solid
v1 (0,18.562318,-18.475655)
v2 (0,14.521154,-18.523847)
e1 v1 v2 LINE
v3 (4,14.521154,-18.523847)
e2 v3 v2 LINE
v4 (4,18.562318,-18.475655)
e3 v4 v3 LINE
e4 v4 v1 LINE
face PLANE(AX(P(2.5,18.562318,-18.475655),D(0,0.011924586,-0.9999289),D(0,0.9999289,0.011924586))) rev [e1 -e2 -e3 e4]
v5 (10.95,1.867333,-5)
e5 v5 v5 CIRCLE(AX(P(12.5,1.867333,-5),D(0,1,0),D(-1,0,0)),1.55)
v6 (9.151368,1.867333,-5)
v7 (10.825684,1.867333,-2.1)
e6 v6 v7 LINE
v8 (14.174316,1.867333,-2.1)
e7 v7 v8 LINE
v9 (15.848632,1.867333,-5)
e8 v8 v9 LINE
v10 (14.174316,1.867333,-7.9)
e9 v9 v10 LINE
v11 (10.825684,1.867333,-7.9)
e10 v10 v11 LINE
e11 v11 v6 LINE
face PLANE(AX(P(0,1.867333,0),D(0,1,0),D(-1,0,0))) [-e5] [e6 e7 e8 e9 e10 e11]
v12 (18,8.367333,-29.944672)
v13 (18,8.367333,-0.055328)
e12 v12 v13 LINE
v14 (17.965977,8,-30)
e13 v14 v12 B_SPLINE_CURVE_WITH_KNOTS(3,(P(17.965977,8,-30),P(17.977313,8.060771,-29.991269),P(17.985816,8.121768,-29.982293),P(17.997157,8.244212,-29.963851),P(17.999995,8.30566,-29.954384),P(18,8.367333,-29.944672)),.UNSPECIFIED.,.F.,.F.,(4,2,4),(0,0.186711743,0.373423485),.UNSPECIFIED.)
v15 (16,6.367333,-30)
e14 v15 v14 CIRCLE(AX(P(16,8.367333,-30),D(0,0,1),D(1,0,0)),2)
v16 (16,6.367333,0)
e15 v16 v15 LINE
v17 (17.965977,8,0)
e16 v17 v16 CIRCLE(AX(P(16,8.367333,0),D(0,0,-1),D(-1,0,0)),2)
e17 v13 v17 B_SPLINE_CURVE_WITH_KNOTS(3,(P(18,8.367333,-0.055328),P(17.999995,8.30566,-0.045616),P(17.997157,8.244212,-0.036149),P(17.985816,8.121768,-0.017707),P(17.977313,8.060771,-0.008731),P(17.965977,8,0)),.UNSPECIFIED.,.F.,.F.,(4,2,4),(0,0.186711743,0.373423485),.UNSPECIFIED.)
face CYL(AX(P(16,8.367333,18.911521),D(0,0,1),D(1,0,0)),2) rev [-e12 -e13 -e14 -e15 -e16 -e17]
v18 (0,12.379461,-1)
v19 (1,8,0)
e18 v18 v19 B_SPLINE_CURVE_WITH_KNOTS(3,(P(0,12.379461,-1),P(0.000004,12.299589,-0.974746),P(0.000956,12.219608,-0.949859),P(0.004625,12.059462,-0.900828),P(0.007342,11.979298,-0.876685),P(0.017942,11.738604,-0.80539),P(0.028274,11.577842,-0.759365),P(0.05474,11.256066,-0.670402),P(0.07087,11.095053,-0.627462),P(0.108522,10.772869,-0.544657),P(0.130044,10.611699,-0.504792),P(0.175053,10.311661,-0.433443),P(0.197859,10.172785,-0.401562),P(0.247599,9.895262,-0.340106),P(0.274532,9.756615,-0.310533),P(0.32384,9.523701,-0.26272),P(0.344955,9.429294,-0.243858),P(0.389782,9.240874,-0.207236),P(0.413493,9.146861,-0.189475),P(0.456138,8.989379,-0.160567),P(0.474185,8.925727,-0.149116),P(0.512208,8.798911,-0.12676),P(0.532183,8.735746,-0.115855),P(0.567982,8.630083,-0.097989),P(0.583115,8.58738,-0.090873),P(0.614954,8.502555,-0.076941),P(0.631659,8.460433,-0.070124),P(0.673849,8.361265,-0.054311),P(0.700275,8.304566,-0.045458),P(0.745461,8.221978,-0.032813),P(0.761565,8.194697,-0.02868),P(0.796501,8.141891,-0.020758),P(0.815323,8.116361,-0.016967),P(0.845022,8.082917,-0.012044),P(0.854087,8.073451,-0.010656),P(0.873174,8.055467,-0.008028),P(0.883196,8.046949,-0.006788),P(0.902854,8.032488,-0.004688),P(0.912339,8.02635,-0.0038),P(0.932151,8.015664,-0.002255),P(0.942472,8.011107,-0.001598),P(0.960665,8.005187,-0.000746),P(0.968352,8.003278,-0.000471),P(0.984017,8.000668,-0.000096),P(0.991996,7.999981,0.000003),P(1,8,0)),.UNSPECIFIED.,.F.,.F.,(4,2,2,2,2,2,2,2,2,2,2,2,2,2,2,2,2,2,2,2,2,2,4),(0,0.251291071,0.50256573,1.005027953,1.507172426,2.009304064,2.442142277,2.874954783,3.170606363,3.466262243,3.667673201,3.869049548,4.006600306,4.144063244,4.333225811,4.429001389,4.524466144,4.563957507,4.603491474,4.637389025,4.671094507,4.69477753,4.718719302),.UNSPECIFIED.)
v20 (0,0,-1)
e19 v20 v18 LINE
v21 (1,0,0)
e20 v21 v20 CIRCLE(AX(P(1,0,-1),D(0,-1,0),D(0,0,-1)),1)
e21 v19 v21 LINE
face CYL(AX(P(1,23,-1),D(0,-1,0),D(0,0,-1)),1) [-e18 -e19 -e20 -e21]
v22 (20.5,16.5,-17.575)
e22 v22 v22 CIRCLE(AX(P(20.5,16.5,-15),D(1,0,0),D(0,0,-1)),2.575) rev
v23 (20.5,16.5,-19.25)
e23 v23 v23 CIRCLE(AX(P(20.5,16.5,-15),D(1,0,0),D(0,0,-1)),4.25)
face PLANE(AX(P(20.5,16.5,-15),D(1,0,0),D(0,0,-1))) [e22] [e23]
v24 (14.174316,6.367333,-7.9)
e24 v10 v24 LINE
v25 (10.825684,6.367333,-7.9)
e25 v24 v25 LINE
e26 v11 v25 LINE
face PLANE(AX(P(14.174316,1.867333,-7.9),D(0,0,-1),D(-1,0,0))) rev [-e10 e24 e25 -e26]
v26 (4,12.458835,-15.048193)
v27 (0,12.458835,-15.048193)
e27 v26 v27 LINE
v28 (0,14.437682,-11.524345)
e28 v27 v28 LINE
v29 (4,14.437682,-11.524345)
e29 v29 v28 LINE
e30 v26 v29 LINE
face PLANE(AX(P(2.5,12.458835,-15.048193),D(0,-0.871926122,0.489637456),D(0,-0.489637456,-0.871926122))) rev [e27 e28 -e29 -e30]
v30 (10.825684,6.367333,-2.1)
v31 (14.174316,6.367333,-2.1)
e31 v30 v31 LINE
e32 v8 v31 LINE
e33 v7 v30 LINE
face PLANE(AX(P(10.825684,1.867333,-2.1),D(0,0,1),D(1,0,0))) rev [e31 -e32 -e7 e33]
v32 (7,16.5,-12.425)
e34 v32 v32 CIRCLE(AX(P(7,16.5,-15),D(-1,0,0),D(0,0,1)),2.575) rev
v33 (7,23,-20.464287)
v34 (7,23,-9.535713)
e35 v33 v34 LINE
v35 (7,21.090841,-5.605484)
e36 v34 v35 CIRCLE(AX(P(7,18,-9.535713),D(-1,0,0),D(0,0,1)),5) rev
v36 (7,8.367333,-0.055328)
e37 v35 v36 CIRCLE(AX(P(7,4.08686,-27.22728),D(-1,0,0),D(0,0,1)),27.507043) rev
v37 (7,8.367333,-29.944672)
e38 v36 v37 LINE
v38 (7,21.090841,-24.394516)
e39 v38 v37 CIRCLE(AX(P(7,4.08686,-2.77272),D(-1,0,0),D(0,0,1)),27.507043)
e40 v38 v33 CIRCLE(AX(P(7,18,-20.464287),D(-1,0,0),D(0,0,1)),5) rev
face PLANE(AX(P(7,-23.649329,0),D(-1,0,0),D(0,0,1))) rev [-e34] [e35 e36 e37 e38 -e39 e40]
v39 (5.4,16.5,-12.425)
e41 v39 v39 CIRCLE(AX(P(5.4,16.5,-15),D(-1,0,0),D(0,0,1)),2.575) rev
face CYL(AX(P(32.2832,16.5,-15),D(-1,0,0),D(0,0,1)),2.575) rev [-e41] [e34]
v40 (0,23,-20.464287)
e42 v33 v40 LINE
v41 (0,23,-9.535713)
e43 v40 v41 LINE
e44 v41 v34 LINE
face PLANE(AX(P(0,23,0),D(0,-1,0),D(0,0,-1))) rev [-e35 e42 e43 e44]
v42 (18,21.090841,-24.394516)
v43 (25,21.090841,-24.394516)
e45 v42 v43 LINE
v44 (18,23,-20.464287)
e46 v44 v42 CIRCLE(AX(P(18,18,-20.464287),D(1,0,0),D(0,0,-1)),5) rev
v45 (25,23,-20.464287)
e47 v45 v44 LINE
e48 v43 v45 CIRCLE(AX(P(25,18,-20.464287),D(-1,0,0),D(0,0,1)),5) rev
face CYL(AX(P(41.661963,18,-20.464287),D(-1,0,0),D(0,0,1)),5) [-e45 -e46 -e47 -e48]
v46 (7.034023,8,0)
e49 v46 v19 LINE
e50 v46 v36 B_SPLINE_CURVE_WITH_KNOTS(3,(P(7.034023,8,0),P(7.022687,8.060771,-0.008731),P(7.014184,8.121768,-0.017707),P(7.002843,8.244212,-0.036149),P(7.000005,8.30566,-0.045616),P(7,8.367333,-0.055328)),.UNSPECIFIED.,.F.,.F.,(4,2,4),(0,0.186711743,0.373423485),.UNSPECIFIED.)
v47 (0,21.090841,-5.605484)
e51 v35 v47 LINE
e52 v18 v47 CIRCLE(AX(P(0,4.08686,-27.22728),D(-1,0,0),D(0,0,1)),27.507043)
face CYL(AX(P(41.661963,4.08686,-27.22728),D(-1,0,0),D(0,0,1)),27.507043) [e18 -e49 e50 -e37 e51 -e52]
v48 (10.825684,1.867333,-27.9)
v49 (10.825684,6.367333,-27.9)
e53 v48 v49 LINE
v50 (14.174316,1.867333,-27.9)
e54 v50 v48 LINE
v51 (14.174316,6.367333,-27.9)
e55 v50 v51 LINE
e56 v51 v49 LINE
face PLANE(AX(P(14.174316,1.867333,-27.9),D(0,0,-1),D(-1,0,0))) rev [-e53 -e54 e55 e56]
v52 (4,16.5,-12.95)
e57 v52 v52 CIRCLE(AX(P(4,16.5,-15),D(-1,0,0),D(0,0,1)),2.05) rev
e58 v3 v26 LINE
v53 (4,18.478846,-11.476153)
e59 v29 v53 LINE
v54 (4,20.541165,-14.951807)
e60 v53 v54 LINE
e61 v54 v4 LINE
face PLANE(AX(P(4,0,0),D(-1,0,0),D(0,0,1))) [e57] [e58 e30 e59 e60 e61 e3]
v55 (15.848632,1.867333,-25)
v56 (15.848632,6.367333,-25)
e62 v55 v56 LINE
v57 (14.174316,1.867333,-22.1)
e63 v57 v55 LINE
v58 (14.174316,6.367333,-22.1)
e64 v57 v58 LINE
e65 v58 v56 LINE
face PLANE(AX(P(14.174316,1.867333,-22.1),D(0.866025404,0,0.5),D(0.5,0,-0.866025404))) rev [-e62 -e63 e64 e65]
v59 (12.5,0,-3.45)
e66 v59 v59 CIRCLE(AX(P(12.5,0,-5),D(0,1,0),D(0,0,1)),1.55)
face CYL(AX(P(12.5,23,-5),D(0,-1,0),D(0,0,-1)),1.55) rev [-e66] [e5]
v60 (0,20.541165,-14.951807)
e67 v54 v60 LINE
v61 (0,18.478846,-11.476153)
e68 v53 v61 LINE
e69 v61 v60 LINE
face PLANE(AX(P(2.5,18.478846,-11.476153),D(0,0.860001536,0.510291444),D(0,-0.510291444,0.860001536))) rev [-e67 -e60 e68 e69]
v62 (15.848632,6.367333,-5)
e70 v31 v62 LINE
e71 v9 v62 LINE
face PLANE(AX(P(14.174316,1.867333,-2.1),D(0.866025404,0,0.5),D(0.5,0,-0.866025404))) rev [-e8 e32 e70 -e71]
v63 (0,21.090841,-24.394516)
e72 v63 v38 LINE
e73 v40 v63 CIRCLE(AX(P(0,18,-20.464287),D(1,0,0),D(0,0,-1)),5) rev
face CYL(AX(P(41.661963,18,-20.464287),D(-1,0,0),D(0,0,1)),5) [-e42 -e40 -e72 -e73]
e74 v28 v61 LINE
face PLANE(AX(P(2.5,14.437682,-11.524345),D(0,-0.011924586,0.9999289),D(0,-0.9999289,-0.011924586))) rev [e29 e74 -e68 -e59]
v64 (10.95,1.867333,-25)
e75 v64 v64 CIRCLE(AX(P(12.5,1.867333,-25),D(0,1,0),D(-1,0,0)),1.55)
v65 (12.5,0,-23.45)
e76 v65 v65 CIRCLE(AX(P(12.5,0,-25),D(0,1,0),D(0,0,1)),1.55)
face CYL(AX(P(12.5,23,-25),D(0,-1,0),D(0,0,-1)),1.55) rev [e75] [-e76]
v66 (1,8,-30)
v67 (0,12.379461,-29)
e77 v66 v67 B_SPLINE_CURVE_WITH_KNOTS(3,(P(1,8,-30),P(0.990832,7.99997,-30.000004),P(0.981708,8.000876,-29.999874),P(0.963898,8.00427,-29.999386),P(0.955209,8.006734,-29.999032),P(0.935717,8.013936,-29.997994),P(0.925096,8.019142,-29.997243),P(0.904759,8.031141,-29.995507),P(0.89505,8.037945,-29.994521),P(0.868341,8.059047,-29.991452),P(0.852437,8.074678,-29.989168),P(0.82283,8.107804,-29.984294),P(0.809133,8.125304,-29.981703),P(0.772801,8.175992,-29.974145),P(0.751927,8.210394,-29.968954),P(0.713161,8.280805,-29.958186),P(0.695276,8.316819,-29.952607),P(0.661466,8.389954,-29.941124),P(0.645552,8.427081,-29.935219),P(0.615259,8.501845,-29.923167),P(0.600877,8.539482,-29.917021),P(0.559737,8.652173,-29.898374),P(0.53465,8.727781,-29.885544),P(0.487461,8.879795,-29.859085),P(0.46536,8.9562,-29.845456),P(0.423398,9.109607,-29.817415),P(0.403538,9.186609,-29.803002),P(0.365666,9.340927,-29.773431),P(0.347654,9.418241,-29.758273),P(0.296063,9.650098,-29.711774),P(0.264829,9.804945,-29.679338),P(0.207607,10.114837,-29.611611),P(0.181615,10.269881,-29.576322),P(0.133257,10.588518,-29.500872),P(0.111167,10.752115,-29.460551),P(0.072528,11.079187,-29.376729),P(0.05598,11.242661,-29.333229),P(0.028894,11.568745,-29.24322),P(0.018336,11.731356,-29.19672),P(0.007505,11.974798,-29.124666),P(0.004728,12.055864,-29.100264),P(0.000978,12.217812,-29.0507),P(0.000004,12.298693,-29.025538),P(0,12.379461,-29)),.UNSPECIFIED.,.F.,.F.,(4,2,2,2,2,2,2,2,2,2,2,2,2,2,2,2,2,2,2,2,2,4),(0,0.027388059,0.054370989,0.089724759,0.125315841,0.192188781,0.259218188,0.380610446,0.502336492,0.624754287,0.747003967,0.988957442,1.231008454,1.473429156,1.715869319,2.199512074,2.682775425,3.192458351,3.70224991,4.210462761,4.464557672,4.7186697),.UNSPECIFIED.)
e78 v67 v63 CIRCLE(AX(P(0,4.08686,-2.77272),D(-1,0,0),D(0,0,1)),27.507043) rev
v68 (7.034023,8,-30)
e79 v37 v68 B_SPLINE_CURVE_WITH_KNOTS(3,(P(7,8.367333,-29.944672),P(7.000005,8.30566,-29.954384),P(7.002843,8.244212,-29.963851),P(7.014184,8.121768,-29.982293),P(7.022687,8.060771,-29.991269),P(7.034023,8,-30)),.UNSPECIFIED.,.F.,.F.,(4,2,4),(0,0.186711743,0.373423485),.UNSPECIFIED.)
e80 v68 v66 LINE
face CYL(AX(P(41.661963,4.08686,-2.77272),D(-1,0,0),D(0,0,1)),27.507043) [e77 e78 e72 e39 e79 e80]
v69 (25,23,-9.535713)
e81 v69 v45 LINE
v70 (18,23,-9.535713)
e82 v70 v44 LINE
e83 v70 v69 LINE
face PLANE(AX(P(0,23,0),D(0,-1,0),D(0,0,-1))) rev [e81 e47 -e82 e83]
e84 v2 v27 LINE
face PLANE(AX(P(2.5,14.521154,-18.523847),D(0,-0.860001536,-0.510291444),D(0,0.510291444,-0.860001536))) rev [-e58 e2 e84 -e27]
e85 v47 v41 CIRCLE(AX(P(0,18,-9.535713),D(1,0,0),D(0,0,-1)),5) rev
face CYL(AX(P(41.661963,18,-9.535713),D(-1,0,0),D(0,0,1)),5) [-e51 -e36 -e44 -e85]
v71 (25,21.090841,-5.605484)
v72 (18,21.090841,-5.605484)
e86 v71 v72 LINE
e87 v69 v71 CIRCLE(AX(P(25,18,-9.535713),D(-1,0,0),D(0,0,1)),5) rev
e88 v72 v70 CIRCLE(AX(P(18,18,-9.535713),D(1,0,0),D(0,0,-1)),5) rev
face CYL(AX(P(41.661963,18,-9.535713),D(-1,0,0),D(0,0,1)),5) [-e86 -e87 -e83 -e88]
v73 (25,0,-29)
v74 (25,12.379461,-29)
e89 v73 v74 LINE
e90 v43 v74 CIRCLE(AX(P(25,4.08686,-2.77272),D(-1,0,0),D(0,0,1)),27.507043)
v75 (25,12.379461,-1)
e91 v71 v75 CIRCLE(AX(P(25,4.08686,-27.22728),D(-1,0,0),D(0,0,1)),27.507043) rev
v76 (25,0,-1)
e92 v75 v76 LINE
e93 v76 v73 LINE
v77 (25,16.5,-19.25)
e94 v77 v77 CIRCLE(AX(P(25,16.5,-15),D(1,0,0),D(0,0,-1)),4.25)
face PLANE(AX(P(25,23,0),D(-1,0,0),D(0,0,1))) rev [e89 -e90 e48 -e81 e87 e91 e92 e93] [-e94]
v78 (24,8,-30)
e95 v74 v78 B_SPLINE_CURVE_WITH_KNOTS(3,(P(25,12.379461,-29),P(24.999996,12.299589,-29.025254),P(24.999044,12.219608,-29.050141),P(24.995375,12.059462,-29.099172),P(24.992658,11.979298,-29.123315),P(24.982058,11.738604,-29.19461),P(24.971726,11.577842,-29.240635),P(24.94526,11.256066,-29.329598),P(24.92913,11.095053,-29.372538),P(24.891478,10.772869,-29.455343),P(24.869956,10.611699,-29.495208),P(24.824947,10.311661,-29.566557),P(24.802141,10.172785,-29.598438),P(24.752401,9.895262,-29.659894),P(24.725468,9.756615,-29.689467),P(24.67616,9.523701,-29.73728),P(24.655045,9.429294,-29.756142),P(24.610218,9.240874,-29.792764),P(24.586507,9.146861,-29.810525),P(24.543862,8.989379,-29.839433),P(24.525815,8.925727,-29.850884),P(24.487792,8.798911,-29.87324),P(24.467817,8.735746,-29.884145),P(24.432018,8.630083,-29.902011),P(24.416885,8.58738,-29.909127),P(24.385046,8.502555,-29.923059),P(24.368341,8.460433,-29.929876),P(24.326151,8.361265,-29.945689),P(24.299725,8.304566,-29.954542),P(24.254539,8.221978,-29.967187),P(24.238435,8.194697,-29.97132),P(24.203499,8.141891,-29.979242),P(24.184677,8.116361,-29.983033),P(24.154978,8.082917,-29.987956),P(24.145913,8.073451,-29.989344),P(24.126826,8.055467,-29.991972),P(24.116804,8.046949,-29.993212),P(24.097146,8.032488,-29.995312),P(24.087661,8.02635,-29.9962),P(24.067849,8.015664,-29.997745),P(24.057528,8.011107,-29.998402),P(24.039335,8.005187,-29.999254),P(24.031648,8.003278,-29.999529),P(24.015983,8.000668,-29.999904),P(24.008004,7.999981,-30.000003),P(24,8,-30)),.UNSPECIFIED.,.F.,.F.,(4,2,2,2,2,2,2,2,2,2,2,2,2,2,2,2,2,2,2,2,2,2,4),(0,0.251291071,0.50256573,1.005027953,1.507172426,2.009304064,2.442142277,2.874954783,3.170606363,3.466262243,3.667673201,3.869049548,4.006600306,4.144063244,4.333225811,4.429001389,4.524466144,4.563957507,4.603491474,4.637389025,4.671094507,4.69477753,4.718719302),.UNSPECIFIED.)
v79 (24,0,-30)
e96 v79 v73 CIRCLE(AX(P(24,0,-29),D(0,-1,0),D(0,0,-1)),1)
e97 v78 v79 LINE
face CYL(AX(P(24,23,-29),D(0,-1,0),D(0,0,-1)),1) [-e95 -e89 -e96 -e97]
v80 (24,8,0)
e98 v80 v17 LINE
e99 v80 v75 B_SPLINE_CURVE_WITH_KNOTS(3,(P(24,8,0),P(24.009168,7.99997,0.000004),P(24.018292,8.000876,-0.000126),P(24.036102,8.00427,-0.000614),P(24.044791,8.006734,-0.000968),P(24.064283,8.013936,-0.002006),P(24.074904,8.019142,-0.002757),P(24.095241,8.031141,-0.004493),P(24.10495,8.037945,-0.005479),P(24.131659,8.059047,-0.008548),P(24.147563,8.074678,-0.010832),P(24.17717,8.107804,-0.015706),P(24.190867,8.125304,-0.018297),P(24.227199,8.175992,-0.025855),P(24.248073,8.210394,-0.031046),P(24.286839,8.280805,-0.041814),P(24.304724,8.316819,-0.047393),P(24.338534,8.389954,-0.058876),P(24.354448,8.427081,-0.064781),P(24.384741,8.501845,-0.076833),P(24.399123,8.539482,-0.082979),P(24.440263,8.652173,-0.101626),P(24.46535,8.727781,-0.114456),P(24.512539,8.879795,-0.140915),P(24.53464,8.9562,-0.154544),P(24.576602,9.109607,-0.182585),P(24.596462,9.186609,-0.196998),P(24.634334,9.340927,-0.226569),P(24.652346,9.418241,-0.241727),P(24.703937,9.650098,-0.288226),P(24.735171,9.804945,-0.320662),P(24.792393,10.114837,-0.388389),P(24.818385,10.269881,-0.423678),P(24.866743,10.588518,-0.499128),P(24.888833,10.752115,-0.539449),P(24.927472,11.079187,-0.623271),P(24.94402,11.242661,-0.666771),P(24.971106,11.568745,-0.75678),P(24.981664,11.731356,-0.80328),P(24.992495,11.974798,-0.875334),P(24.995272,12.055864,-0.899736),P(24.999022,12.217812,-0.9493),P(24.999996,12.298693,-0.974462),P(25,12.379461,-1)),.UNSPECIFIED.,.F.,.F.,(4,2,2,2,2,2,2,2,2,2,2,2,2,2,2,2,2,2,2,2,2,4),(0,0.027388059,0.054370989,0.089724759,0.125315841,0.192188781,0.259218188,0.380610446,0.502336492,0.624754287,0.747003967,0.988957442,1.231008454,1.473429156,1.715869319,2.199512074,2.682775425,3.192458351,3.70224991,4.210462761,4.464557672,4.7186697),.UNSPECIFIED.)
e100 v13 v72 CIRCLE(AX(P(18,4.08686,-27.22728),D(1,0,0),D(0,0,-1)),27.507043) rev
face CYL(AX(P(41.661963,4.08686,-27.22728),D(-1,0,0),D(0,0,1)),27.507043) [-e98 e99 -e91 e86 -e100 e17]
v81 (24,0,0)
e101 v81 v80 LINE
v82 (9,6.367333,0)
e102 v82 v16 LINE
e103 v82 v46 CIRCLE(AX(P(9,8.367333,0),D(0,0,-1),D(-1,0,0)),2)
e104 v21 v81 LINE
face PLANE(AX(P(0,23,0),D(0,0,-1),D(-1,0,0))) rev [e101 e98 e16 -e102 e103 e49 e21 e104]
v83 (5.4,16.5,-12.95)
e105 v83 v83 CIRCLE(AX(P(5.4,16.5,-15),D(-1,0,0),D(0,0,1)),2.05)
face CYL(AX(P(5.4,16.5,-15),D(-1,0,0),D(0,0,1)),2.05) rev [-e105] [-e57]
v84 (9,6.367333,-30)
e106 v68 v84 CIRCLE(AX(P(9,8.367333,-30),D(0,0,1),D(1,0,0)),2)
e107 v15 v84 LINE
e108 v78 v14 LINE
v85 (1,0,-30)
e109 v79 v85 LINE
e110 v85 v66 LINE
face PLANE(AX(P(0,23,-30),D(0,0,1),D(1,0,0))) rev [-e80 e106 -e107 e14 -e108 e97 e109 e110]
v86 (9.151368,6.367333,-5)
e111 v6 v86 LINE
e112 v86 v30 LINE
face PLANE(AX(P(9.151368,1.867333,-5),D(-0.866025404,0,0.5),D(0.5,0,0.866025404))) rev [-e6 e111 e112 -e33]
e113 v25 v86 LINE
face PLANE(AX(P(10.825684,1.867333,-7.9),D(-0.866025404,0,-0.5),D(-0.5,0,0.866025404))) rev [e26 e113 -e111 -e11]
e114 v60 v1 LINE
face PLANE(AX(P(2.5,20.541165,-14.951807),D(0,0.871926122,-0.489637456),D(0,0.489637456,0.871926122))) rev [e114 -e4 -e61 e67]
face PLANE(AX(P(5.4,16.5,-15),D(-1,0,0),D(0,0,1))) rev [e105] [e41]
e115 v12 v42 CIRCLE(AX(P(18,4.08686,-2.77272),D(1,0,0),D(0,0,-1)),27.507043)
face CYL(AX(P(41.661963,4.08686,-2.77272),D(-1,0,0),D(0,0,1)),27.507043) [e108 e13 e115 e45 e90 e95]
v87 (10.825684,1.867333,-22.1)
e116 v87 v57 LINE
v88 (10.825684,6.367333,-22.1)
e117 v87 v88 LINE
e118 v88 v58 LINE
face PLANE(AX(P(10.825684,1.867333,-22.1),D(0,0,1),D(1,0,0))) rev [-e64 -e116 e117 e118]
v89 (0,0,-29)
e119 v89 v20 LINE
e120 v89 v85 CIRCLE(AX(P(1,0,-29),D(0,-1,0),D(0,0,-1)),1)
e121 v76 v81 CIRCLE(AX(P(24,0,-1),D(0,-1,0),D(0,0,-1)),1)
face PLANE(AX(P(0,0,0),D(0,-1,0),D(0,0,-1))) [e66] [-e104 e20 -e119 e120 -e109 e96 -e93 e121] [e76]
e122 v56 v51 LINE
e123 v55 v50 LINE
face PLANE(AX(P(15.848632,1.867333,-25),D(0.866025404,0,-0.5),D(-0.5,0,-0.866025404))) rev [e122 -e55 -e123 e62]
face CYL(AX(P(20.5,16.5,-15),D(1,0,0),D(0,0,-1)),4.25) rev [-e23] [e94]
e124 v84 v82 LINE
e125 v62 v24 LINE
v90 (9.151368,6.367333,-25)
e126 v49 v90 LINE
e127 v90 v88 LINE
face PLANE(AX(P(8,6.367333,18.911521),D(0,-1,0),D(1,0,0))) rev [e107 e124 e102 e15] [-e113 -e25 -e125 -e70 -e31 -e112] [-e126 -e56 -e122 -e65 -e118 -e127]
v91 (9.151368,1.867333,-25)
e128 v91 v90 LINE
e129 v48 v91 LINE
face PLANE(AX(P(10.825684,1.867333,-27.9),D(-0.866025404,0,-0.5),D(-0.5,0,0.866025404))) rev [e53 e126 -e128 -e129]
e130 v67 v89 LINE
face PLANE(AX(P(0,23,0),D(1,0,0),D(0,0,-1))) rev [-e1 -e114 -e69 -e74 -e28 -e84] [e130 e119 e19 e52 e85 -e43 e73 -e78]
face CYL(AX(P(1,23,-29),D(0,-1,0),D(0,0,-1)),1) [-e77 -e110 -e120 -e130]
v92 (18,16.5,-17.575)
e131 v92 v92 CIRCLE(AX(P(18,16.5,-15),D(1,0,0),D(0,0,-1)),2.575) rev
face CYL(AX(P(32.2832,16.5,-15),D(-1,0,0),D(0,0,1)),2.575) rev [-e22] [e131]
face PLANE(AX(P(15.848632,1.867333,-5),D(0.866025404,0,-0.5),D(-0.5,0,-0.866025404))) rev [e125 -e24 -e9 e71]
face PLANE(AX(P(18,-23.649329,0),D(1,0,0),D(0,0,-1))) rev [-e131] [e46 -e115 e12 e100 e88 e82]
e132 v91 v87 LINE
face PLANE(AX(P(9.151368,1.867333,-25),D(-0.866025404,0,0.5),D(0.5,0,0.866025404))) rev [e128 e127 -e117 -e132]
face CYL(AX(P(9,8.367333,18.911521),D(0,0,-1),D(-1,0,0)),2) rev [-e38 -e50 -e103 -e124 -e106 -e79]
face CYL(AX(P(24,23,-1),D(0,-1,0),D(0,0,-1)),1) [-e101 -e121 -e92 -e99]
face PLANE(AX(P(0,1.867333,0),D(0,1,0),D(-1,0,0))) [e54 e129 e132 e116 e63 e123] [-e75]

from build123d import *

# Parameters (mm, degrees)
CROQUIS1_W              = 25
CROQUIS1_H              = 30
CROQUIS1_R              = 1.55
SALIENTE_EXTRUIR1_DEPTH = 23
CORTAR_EXTRUIR1_REACH   = 47.321
CROQUIS2_W              = 9
CROQUIS2_H              = 16.632666969
CORTAR_EXTRUIR2_REACH   = 47.321
CROQUIS3_R              = 2.575
CORTAR_EXTRUIR3_DEPTH   = 2.5
CROQUIS5_R              = 4.25
CORTAR_EXTRUIR4_DEPTH   = 4.5
CORTAR_EXTRUIR5_DEPTH   = 4.5
CORTAR_EXTRUIR6_REACH   = 47.321
REDONDEO3_R             = 1
CROQUIS8_R              = 2.575
CROQUIS8_R_2            = 2.05
SALIENTE_EXTRUIR2_DEPTH = 2.9
CORTAR_EXTRUIR7_DEPTH   = 1.5
CORTAR_EXTRUIR8_START   = -16.632667
CROQUIS10_W             = 1
CROQUIS10_H             = 30
CORTAR_EXTRUIR8_DEPTH   = 16.632667
REDONDEO4_R             = 5
REDONDEO5_R             = 2


with BuildPart() as part:
    # Croquis1 → Saliente-Extruir1 (new body)
    with BuildSketch(Plane(origin=(0, 0, 0), x_dir=(1, 0, 0), z_dir=(0, 1, 0))):
        with Locations((12.5, 15)):
            Rectangle(CROQUIS1_W, CROQUIS1_H)
        with Locations(Location((12.5, 25, 0), (0, 0, 270))):
            Circle(CROQUIS1_R, mode=Mode.SUBTRACT)
        with Locations(Location((12.5, 5, 0), (0, 0, 270))):
            Circle(CROQUIS1_R, mode=Mode.SUBTRACT)
    extrude(amount=SALIENTE_EXTRUIR1_DEPTH)

    # Cortar-Extruir1: up to this face of the body (flat: up to its plane)
    cortar_extruir1_end = Plane(part.part.faces().sort_by_distance((12.5, 11.5, 0))[0])
    # Croquis2 → Cortar-Extruir1 (cut, up to the picked face)
    with BuildSketch(Plane(origin=(0, 0, -30), x_dir=(-1, 0, 0), z_dir=(0, 0, -1)), mode=Mode.PRIVATE) as cortar_extruir1_sk1:
        with Locations((-12.5, 14.683666516)):
            Rectangle(CROQUIS2_W, CROQUIS2_H)
    cortar_extruir1_tool1 = split(extrude(cortar_extruir1_sk1.sketch, amount=-CORTAR_EXTRUIR1_REACH, mode=Mode.PRIVATE), bisect_by=cortar_extruir1_end, keep=Keep.BOTH, mode=Mode.PRIVATE)
    add(cortar_extruir1_tool1.solids().sort_by(Axis((12.5, 14.683667, -30), (0, 0, 1)))[0], mode=Mode.SUBTRACT)

    # Cortar-Extruir2: up to this face of the body (flat: up to its plane)
    cortar_extruir2_end = Plane(part.part.faces().sort_by_distance((25, 11.5, -15))[0])
    # Croquis3 → Cortar-Extruir2 (cut, up to the picked face)
    with BuildSketch(Plane.ZY, mode=Mode.PRIVATE) as cortar_extruir2_sk1:
        with Locations((-15, 16.5)):
            Circle(CROQUIS3_R)
    cortar_extruir2_tool1 = split(extrude(cortar_extruir2_sk1.sketch, amount=-CORTAR_EXTRUIR2_REACH, mode=Mode.PRIVATE), bisect_by=cortar_extruir2_end, keep=Keep.BOTH, mode=Mode.PRIVATE)
    add(cortar_extruir2_tool1.solids().sort_by(Axis((0, 16.5, -15), (1, 0, 0)))[0], mode=Mode.SUBTRACT)

    # Croquis4 → Cortar-Extruir3 (cut)
    with BuildSketch(Plane.ZY):
        Polygon((-14.95180736, 20.541164535), (-18.475654829, 18.562318318), (-18.523847469, 14.521153783), (-15.04819264, 12.458835465), (-11.524345171, 14.437681682), (-11.476152531, 18.478846217), align=None)
    extrude(amount=-CORTAR_EXTRUIR3_DEPTH, mode=Mode.SUBTRACT)

    # Croquis5 → Cortar-Extruir4 (cut)
    with BuildSketch(Plane(origin=(25, 0, 0), x_dir=(0, 0, -1), z_dir=(1, 0, 0))):
        with Locations((15, 16.5)):
            Circle(CROQUIS5_R)
    extrude(amount=-CORTAR_EXTRUIR4_DEPTH, mode=Mode.SUBTRACT)

    # Croquis6 → Cortar-Extruir5 (cut)
    with BuildSketch(Plane(origin=(0, 6.367333031, 0), x_dir=(1, 0, 0), z_dir=(0, 1, 0))):
        Polygon((15.848631561, 25), (14.174315781, 27.9), (10.825684219, 27.9), (9.151368439, 25), (10.825684219, 22.1), (14.174315781, 22.1), align=None)
        Polygon((15.848631561, 5), (14.174315781, 7.9), (10.825684219, 7.9), (9.151368439, 5), (10.825684219, 2.1), (14.174315781, 2.1), align=None)
    extrude(amount=-CORTAR_EXTRUIR5_DEPTH, mode=Mode.SUBTRACT)

    # Cortar-Extruir6: up to this face of the body (flat: up to its plane)
    cortar_extruir6_end = Plane(part.part.faces().sort_by_distance((25, 11.051957593, -15))[0])
    # Croquis7 → Cortar-Extruir6 (cut, up to the picked face)
    with BuildSketch(Plane.ZY, mode=Mode.PRIVATE) as cortar_extruir6_sk1:
        with BuildLine():
            Line((-22.745966692, 23), (-30, 23))
            Line((-30, 23), (-30, 8))
            ThreePointArc((-30, 8), (-27.536048339, 16.062460813), (-22.745966692, 23))
        make_face()
    cortar_extruir6_tool1 = split(extrude(cortar_extruir6_sk1.sketch, amount=-CORTAR_EXTRUIR6_REACH, mode=Mode.PRIVATE), bisect_by=cortar_extruir6_end, keep=Keep.BOTH, mode=Mode.PRIVATE)
    # Croquis7 → Cortar-Extruir6 (cut, up to the picked face)
    with BuildSketch(Plane.ZY, mode=Mode.PRIVATE) as cortar_extruir6_sk2:
        with BuildLine():
            Line((0, 23), (-7.254033308, 23))
            ThreePointArc((-7.254033308, 23), (-2.463951661, 16.062460813), (0, 8))
            Line((0, 8), (0, 23))
        make_face()
    cortar_extruir6_tool2 = split(extrude(cortar_extruir6_sk2.sketch, amount=-CORTAR_EXTRUIR6_REACH, mode=Mode.PRIVATE), bisect_by=cortar_extruir6_end, keep=Keep.BOTH, mode=Mode.PRIVATE)
    add(cortar_extruir6_tool1.solids().sort_by(Axis((0, 18.820242, -27.849866), (1, 0, 0)))[0], mode=Mode.SUBTRACT)
    add(cortar_extruir6_tool2.solids().sort_by(Axis((0, 18.820242, -2.150134), (1, 0, 0)))[0], mode=Mode.SUBTRACT)

    # Redondeo3
    redondeo3_edges = [part.edges().sort_by_distance(p)[0] for p in [
        (25, 4, -30),
        (0, 4, -30),
        (25, 4, 0),
        (0, 4, 0),
    ]]
    fillet(redondeo3_edges, radius=REDONDEO3_R)

    # Croquis8 → Saliente-Extruir2 (add)
    with BuildSketch(Plane.ZY.offset(-2.5)):
        with Locations((-15, 16.5)):
            Circle(CROQUIS8_R)
        with Locations((-15, 16.5)):
            Circle(CROQUIS8_R_2, mode=Mode.SUBTRACT)
    extrude(amount=-SALIENTE_EXTRUIR2_DEPTH)

    # Croquis9 → Cortar-Extruir7 (cut)
    with BuildSketch(Plane.ZY.offset(-2.5)):
        Polygon((-11.476152531, 18.478846217), (-14.95180736, 20.541164535), (-18.475654829, 18.562318318), (-18.523847469, 14.521153783), (-15.04819264, 12.458835465), (-11.524345171, 14.437681682), align=None)
    extrude(amount=-CORTAR_EXTRUIR7_DEPTH, mode=Mode.SUBTRACT)

    # Croquis10 → Cortar-Extruir8 (cut)
    with BuildSketch(Plane(origin=(0, 23, 0), x_dir=(1, 0, 0), z_dir=(0, 1, 0)).offset(CORTAR_EXTRUIR8_START)):
        with Locations((17.5, 15)):
            Rectangle(CROQUIS10_W, CROQUIS10_H)
        with Locations((7.5, 15)):
            Rectangle(CROQUIS10_W, CROQUIS10_H)
    extrude(amount=CORTAR_EXTRUIR8_DEPTH, mode=Mode.SUBTRACT)

    # Redondeo4
    redondeo4_edges = [part.edges().sort_by_distance(p)[0] for p in [
        (21.5, 23, -22.745966692),
        (21.5, 23, -7.254033308),
        (3.5, 23, -22.745966692),
        (3.5, 23, -7.254033308),
    ]]
    fillet(redondeo4_edges, radius=REDONDEO4_R)

    # Redondeo5
    # the kernel refuses this fillet: 2 mm, written as the material it adds along each edge
    with BuildSketch(Plane(origin=(7, 6.367333, 0), x_dir=(1, 0, 0), z_dir=(0, 0, -1))) as redondeo5_piece_1_section:
        with BuildLine():
            CenterArc((REDONDEO5_R, -REDONDEO5_R), REDONDEO5_R, 90, 90)
            Line((0, -REDONDEO5_R), (0, 0))
            Line((0, 0), (REDONDEO5_R, 0))
        make_face()
    redondeo5_piece_1 = extrude(amount=30, mode=Mode.PRIVATE)
    redondeo5_piece_1 = redondeo5_piece_1 & Plane(origin=(7.452804223, 4.086860333, -2.772720189), x_dir=(0, 0.14225955268543314, -0.9898293891725687), z_dir=(-1, 0, 0)) * Cylinder(27.507043243, 68, mode=Mode.PRIVATE)
    redondeo5_piece_1 = redondeo5_piece_1 & Plane(origin=(7.452804223, 4.086860333, -27.227279811), x_dir=(0, 0.6875744332215433, 0.7261139020705178), z_dir=(-1, 0, 0)) * Cylinder(27.507043243, 68, mode=Mode.PRIVATE)
    add(redondeo5_piece_1)
    with BuildSketch(Plane(origin=(18, 6.367333, 0), x_dir=(0, 1, 0), z_dir=(0, 0, -1))) as redondeo5_piece_2_section:
        with BuildLine():
            CenterArc((REDONDEO5_R, -REDONDEO5_R), REDONDEO5_R, 90, 90)
            Line((0, -REDONDEO5_R), (0, 0))
            Line((0, 0), (REDONDEO5_R, 0))
        make_face()
    redondeo5_piece_2 = extrude(amount=30, mode=Mode.PRIVATE)
    redondeo5_piece_2 = redondeo5_piece_2 & Plane(origin=(17.547195777, 4.086860333, -27.227279811), x_dir=(0, 0.6875744332215433, 0.7261139020705178), z_dir=(-1, 0, 0)) * Cylinder(27.507043243, 69, mode=Mode.PRIVATE)
    redondeo5_piece_2 = redondeo5_piece_2 & Plane(origin=(17.547195777, 4.086860333, -2.772720189), x_dir=(0, 0.14225955268543314, -0.9898293891725687), z_dir=(-1, 0, 0)) * Cylinder(27.507043243, 69, mode=Mode.PRIVATE)
    add(redondeo5_piece_2)


solid = part.part
